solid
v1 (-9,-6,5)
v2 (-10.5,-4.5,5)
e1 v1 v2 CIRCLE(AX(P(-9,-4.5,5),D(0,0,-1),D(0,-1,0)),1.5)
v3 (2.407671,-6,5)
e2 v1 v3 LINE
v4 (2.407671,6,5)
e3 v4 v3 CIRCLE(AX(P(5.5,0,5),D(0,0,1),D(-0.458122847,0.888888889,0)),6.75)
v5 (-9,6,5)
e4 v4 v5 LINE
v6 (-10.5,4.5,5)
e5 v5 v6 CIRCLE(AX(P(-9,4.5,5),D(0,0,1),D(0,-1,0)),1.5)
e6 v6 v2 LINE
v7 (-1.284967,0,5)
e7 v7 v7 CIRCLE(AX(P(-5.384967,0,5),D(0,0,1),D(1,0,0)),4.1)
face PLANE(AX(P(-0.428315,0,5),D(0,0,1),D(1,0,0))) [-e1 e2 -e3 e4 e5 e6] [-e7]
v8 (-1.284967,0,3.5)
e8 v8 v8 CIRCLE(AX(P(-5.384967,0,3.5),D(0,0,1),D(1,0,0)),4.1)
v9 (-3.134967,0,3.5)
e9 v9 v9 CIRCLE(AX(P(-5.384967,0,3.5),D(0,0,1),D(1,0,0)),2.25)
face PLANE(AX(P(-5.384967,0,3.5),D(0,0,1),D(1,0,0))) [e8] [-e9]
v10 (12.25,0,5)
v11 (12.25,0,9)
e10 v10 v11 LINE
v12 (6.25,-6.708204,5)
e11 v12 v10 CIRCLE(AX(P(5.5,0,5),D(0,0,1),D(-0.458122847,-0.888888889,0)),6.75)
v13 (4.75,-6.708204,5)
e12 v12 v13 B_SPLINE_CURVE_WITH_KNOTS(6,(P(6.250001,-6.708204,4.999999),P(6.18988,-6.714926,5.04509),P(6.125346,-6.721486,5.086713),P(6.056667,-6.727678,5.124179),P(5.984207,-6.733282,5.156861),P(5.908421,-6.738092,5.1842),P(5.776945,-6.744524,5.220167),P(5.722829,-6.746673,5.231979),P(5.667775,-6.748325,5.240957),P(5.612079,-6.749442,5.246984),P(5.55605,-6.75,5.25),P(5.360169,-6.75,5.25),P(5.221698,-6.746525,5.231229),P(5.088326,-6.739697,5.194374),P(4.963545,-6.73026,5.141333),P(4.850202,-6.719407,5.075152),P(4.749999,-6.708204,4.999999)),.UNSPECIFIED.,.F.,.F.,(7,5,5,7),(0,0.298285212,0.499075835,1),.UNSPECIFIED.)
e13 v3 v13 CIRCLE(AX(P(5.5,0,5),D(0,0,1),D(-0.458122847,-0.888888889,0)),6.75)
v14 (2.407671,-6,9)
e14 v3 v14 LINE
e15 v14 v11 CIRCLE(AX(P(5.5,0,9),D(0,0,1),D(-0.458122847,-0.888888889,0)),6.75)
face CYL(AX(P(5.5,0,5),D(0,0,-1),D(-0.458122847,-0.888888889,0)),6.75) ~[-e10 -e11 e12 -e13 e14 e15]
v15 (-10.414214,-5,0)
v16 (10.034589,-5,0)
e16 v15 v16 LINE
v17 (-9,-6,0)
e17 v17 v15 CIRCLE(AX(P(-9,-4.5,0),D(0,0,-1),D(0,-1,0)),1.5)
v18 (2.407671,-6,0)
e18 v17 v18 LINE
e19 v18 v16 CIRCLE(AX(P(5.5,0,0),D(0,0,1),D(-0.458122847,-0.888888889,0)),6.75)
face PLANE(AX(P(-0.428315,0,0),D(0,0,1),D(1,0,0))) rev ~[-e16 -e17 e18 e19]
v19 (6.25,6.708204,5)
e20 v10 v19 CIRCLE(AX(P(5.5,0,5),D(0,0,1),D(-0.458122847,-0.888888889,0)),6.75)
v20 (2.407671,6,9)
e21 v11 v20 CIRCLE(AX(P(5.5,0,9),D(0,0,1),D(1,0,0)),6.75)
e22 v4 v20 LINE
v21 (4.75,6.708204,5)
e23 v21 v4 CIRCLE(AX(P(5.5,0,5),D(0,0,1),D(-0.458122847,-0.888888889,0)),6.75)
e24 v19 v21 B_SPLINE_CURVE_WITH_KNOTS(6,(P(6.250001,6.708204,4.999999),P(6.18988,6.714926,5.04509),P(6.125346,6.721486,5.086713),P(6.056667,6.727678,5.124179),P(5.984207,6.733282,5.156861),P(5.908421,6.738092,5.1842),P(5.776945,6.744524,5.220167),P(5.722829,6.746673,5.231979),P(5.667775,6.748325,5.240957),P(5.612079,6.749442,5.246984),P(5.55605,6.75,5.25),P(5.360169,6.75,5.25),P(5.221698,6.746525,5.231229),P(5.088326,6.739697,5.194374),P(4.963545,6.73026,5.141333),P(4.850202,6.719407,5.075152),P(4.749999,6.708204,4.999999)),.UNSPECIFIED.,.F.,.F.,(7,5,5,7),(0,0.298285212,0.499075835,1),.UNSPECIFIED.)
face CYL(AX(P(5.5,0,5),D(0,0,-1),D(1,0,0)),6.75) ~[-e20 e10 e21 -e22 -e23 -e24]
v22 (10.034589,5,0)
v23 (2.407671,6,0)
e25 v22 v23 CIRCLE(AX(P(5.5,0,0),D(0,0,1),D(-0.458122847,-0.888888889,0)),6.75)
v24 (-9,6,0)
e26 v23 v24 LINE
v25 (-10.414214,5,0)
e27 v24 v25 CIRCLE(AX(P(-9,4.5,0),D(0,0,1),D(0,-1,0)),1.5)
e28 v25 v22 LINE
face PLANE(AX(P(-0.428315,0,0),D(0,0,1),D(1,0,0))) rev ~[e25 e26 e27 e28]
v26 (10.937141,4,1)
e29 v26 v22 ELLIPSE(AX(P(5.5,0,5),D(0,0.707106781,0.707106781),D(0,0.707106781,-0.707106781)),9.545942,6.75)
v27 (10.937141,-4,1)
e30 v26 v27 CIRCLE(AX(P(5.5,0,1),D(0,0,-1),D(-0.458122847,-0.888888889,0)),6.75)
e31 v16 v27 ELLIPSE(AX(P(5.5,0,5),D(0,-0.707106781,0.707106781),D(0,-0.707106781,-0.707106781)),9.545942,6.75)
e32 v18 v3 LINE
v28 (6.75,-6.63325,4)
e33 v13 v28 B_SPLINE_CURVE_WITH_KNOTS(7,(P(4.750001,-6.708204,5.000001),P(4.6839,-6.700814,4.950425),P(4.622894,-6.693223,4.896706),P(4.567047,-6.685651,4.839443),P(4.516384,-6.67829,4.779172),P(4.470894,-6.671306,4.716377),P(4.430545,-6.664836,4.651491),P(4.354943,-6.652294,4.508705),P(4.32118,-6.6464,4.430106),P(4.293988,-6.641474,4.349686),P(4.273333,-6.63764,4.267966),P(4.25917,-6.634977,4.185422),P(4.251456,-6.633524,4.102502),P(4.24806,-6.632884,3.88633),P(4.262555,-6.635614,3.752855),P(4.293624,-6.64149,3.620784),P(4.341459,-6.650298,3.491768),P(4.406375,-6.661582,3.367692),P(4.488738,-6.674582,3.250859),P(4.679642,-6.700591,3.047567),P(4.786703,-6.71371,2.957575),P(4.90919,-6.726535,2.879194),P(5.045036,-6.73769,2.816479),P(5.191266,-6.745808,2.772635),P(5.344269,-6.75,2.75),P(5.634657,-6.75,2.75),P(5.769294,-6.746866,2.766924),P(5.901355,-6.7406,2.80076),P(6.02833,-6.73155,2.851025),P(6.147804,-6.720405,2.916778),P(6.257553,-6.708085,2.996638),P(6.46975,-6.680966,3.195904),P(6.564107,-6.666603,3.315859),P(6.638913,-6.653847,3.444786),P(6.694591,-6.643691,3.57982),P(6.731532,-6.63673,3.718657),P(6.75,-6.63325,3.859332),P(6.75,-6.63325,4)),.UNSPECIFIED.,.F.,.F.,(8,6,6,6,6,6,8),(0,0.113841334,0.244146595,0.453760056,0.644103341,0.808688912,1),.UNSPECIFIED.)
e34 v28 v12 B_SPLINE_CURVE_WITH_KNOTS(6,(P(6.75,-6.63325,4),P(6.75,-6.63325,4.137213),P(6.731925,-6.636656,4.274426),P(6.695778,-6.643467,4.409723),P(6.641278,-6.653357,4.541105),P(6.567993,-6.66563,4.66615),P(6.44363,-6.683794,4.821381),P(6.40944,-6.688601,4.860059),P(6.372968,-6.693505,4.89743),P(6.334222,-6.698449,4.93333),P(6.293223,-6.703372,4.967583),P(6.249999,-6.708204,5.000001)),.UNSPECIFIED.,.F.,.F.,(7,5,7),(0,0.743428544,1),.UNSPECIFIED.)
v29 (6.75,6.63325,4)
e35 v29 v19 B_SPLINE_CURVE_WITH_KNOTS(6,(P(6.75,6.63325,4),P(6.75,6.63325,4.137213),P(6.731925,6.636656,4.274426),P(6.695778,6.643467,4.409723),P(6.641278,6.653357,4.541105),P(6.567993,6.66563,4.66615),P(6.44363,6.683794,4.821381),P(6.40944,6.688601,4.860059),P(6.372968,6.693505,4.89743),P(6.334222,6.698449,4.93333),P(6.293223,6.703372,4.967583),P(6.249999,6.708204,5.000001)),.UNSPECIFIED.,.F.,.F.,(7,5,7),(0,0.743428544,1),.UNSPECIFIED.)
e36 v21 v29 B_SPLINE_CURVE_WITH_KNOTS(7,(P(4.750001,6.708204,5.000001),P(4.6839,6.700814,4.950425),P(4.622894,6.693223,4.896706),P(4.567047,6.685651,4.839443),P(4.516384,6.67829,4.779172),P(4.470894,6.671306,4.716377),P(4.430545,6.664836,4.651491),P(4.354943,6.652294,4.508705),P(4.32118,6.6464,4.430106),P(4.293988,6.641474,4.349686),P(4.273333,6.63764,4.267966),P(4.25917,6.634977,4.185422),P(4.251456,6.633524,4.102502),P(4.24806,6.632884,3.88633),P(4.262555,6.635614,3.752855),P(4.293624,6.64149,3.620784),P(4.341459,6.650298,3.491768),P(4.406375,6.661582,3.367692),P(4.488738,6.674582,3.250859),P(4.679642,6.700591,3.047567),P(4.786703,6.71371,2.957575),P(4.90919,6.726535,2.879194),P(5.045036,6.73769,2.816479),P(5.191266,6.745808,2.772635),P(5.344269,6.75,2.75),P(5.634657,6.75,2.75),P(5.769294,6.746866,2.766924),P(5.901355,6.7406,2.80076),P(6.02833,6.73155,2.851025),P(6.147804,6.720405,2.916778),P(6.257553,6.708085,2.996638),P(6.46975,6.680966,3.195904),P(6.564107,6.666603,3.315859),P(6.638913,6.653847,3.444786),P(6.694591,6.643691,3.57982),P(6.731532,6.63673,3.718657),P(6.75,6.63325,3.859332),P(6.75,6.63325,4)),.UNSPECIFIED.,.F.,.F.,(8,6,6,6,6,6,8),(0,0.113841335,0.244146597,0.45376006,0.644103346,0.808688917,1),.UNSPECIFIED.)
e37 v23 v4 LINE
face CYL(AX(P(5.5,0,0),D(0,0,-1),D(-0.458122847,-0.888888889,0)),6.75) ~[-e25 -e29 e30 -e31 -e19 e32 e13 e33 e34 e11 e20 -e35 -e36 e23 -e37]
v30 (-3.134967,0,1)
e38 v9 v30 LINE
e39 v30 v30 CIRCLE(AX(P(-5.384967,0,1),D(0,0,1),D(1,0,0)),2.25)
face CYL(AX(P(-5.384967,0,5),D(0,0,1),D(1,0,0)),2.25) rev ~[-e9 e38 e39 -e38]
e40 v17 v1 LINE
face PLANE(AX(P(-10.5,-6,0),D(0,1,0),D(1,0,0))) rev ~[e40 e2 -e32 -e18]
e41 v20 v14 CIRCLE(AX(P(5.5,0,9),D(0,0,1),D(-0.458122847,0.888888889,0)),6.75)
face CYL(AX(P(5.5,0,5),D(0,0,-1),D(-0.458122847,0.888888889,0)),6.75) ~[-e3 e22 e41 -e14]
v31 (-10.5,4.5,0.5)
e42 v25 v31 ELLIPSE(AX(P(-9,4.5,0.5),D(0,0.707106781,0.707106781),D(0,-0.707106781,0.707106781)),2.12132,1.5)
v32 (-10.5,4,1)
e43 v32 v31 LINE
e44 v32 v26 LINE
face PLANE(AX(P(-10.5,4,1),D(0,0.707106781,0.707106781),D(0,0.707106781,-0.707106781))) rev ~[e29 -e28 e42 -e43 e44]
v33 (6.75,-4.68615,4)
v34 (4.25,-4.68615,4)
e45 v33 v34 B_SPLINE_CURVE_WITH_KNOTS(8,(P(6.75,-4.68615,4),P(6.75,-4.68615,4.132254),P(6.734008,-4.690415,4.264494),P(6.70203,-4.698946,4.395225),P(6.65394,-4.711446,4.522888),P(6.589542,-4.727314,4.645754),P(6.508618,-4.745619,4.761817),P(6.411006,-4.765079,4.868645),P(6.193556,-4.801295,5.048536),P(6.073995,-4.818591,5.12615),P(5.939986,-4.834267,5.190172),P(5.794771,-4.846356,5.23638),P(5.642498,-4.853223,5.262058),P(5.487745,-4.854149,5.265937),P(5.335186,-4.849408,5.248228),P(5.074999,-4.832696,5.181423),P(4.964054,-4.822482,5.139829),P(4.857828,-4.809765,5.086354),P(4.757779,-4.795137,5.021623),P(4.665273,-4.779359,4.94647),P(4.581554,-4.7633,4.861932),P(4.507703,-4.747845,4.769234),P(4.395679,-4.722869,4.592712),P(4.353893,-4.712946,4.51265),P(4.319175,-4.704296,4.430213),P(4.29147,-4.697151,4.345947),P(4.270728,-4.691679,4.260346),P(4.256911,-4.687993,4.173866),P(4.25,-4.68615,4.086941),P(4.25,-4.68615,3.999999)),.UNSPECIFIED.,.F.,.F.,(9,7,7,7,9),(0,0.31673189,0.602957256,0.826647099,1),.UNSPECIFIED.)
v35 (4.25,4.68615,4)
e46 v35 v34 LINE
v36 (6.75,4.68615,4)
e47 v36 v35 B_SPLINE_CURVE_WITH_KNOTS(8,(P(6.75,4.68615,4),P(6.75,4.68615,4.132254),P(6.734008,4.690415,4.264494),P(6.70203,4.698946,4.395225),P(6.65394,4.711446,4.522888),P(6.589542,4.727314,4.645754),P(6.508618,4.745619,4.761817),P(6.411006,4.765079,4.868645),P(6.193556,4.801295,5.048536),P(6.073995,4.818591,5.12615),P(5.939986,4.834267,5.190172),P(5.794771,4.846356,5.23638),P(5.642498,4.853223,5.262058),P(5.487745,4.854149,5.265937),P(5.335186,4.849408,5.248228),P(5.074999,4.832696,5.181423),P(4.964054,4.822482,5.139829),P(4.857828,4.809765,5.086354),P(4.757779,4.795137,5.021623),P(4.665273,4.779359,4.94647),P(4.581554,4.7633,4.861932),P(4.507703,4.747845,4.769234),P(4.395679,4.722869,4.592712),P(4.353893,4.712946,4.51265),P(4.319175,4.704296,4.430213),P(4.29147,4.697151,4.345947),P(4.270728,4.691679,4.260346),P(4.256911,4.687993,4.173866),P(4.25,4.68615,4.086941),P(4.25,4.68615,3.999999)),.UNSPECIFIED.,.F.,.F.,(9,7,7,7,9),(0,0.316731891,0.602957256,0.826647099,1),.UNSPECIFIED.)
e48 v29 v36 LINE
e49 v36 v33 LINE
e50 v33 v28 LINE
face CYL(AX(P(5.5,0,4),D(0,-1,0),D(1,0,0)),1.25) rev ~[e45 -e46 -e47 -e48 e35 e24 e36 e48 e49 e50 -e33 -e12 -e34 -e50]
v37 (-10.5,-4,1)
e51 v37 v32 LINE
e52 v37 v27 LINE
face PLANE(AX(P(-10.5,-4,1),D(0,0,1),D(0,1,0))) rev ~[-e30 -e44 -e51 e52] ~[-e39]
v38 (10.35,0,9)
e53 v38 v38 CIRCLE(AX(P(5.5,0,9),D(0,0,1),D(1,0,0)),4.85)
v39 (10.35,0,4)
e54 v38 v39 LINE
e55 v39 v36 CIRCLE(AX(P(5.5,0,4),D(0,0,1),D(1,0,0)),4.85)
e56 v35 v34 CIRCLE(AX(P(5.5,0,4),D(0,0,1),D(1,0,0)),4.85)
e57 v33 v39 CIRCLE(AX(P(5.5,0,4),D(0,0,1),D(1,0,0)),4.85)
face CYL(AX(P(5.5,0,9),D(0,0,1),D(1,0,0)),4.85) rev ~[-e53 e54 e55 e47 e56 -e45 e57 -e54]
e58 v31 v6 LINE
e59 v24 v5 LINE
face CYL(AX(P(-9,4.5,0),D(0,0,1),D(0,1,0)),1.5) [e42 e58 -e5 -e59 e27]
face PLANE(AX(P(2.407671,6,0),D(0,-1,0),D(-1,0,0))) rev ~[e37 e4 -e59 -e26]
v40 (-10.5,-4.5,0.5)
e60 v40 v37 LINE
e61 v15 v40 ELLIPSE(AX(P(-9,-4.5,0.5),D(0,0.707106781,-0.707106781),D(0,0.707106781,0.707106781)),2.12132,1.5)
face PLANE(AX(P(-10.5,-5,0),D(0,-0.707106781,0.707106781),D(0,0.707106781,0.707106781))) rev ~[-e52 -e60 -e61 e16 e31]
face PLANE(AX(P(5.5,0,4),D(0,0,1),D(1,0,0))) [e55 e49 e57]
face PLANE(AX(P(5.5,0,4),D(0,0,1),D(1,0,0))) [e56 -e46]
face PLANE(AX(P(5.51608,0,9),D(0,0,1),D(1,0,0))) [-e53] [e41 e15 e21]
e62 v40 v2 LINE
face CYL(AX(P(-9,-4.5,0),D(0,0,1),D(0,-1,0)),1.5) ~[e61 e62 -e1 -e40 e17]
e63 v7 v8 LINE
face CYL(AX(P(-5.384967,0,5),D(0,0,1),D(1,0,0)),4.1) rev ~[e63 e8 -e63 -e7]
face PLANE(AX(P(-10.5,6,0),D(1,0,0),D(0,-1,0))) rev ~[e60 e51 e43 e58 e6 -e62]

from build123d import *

# Parameters (mm, degrees)
F1_DEPTH  = 5
F3_DEPTH  = 22.751
F4_R      = 2.25
F5_DEPTH  = 25
F6_R      = 4.1
F6_R_2    = 2.25
F7_DEPTH  = 1.5
F9_DEPTH  = 4
F10_R     = 1.5
F11_R     = 4.85
F12_DEPTH = 5
F13_R     = 1.25
F14_DEPTH = 12.5


# Not quite as in the source:
# - a feature names something its author has since deleted; it is built from what else it names


with BuildPart() as f1:
    # F0 (on Top) → F1 (new body)
    with BuildSketch(Plane.XY):
        with BuildLine():
            Line((-10.5, -6), (2.4076707808, -6))
            ThreePointArc((2.4076707808, -6), (12.25, 0), (2.4076707808, 6))
            Line((2.4076707808, 6), (-10.5, 6))
            Line((-10.5, 6), (-10.5, -6))
        make_face()
    extrude(amount=F1_DEPTH)

    # F2 (on face) → F3 (cut, through all)
    with BuildSketch(Plane(origin=(-10.5, 0, 0), x_dir=(0, -1, 0), z_dir=(-1, 0, 0))):
        Polygon((5, 0), (4, 1), (-4, 1), (-5, 0), align=None)
    extrude(amount=-F3_DEPTH, mode=Mode.SUBTRACT)

    # F4 (on face) → F5 (cut)
    with BuildSketch(Plane.XY.offset(5)):
        with Locations((-5.3849667311, 0)):
            Circle(F4_R)
    extrude(amount=-F5_DEPTH, mode=Mode.SUBTRACT)

    # F6 (on face) → F7 (cut)
    with BuildSketch(Plane.XY.offset(5)):
        with Locations((-5.3849667311, 0)):
            Circle(F6_R)
        with Locations((-5.3849667311, 0)):
            Circle(F6_R_2, mode=Mode.SUBTRACT)
    extrude(amount=-F7_DEPTH, mode=Mode.SUBTRACT)

    # F8 (on face) → F9 (join)
    with BuildSketch(Plane.XY.offset(5)):
        with BuildLine():
            ThreePointArc((2.4076707808, -6), (9.0134938288, -5.7634938288), (12.25, 0))
            ThreePointArc((12.25, 0), (9.0134938288, 5.7634938288), (2.4076707808, 6))
            ThreePointArc((2.4076707808, 6), (-1.25, 0), (2.4076707808, -6))
        make_face()
    extrude(amount=F9_DEPTH)

    # F10
    f10_edges = [f1.edges().sort_by_distance(p)[0] for p in [
        (-10.5, -6, 2.5),
        (-10.5, 6, 2.5),
    ]]
    fillet(f10_edges, radius=F10_R)

    # F11 (on face) → F12 (cut)
    with BuildSketch(Plane.XY.offset(9)):
        with Locations((5.5, 0)):
            Circle(F11_R)
    extrude(amount=-F12_DEPTH, mode=Mode.SUBTRACT)

    # F13 (on Front) → F14 (cut, symmetric)
    with BuildSketch(Plane.XZ):
        with Locations((5.5, 4)):
            Circle(F13_R)
    extrude(amount=F14_DEPTH, both=True, mode=Mode.SUBTRACT)


solid = f1.part
